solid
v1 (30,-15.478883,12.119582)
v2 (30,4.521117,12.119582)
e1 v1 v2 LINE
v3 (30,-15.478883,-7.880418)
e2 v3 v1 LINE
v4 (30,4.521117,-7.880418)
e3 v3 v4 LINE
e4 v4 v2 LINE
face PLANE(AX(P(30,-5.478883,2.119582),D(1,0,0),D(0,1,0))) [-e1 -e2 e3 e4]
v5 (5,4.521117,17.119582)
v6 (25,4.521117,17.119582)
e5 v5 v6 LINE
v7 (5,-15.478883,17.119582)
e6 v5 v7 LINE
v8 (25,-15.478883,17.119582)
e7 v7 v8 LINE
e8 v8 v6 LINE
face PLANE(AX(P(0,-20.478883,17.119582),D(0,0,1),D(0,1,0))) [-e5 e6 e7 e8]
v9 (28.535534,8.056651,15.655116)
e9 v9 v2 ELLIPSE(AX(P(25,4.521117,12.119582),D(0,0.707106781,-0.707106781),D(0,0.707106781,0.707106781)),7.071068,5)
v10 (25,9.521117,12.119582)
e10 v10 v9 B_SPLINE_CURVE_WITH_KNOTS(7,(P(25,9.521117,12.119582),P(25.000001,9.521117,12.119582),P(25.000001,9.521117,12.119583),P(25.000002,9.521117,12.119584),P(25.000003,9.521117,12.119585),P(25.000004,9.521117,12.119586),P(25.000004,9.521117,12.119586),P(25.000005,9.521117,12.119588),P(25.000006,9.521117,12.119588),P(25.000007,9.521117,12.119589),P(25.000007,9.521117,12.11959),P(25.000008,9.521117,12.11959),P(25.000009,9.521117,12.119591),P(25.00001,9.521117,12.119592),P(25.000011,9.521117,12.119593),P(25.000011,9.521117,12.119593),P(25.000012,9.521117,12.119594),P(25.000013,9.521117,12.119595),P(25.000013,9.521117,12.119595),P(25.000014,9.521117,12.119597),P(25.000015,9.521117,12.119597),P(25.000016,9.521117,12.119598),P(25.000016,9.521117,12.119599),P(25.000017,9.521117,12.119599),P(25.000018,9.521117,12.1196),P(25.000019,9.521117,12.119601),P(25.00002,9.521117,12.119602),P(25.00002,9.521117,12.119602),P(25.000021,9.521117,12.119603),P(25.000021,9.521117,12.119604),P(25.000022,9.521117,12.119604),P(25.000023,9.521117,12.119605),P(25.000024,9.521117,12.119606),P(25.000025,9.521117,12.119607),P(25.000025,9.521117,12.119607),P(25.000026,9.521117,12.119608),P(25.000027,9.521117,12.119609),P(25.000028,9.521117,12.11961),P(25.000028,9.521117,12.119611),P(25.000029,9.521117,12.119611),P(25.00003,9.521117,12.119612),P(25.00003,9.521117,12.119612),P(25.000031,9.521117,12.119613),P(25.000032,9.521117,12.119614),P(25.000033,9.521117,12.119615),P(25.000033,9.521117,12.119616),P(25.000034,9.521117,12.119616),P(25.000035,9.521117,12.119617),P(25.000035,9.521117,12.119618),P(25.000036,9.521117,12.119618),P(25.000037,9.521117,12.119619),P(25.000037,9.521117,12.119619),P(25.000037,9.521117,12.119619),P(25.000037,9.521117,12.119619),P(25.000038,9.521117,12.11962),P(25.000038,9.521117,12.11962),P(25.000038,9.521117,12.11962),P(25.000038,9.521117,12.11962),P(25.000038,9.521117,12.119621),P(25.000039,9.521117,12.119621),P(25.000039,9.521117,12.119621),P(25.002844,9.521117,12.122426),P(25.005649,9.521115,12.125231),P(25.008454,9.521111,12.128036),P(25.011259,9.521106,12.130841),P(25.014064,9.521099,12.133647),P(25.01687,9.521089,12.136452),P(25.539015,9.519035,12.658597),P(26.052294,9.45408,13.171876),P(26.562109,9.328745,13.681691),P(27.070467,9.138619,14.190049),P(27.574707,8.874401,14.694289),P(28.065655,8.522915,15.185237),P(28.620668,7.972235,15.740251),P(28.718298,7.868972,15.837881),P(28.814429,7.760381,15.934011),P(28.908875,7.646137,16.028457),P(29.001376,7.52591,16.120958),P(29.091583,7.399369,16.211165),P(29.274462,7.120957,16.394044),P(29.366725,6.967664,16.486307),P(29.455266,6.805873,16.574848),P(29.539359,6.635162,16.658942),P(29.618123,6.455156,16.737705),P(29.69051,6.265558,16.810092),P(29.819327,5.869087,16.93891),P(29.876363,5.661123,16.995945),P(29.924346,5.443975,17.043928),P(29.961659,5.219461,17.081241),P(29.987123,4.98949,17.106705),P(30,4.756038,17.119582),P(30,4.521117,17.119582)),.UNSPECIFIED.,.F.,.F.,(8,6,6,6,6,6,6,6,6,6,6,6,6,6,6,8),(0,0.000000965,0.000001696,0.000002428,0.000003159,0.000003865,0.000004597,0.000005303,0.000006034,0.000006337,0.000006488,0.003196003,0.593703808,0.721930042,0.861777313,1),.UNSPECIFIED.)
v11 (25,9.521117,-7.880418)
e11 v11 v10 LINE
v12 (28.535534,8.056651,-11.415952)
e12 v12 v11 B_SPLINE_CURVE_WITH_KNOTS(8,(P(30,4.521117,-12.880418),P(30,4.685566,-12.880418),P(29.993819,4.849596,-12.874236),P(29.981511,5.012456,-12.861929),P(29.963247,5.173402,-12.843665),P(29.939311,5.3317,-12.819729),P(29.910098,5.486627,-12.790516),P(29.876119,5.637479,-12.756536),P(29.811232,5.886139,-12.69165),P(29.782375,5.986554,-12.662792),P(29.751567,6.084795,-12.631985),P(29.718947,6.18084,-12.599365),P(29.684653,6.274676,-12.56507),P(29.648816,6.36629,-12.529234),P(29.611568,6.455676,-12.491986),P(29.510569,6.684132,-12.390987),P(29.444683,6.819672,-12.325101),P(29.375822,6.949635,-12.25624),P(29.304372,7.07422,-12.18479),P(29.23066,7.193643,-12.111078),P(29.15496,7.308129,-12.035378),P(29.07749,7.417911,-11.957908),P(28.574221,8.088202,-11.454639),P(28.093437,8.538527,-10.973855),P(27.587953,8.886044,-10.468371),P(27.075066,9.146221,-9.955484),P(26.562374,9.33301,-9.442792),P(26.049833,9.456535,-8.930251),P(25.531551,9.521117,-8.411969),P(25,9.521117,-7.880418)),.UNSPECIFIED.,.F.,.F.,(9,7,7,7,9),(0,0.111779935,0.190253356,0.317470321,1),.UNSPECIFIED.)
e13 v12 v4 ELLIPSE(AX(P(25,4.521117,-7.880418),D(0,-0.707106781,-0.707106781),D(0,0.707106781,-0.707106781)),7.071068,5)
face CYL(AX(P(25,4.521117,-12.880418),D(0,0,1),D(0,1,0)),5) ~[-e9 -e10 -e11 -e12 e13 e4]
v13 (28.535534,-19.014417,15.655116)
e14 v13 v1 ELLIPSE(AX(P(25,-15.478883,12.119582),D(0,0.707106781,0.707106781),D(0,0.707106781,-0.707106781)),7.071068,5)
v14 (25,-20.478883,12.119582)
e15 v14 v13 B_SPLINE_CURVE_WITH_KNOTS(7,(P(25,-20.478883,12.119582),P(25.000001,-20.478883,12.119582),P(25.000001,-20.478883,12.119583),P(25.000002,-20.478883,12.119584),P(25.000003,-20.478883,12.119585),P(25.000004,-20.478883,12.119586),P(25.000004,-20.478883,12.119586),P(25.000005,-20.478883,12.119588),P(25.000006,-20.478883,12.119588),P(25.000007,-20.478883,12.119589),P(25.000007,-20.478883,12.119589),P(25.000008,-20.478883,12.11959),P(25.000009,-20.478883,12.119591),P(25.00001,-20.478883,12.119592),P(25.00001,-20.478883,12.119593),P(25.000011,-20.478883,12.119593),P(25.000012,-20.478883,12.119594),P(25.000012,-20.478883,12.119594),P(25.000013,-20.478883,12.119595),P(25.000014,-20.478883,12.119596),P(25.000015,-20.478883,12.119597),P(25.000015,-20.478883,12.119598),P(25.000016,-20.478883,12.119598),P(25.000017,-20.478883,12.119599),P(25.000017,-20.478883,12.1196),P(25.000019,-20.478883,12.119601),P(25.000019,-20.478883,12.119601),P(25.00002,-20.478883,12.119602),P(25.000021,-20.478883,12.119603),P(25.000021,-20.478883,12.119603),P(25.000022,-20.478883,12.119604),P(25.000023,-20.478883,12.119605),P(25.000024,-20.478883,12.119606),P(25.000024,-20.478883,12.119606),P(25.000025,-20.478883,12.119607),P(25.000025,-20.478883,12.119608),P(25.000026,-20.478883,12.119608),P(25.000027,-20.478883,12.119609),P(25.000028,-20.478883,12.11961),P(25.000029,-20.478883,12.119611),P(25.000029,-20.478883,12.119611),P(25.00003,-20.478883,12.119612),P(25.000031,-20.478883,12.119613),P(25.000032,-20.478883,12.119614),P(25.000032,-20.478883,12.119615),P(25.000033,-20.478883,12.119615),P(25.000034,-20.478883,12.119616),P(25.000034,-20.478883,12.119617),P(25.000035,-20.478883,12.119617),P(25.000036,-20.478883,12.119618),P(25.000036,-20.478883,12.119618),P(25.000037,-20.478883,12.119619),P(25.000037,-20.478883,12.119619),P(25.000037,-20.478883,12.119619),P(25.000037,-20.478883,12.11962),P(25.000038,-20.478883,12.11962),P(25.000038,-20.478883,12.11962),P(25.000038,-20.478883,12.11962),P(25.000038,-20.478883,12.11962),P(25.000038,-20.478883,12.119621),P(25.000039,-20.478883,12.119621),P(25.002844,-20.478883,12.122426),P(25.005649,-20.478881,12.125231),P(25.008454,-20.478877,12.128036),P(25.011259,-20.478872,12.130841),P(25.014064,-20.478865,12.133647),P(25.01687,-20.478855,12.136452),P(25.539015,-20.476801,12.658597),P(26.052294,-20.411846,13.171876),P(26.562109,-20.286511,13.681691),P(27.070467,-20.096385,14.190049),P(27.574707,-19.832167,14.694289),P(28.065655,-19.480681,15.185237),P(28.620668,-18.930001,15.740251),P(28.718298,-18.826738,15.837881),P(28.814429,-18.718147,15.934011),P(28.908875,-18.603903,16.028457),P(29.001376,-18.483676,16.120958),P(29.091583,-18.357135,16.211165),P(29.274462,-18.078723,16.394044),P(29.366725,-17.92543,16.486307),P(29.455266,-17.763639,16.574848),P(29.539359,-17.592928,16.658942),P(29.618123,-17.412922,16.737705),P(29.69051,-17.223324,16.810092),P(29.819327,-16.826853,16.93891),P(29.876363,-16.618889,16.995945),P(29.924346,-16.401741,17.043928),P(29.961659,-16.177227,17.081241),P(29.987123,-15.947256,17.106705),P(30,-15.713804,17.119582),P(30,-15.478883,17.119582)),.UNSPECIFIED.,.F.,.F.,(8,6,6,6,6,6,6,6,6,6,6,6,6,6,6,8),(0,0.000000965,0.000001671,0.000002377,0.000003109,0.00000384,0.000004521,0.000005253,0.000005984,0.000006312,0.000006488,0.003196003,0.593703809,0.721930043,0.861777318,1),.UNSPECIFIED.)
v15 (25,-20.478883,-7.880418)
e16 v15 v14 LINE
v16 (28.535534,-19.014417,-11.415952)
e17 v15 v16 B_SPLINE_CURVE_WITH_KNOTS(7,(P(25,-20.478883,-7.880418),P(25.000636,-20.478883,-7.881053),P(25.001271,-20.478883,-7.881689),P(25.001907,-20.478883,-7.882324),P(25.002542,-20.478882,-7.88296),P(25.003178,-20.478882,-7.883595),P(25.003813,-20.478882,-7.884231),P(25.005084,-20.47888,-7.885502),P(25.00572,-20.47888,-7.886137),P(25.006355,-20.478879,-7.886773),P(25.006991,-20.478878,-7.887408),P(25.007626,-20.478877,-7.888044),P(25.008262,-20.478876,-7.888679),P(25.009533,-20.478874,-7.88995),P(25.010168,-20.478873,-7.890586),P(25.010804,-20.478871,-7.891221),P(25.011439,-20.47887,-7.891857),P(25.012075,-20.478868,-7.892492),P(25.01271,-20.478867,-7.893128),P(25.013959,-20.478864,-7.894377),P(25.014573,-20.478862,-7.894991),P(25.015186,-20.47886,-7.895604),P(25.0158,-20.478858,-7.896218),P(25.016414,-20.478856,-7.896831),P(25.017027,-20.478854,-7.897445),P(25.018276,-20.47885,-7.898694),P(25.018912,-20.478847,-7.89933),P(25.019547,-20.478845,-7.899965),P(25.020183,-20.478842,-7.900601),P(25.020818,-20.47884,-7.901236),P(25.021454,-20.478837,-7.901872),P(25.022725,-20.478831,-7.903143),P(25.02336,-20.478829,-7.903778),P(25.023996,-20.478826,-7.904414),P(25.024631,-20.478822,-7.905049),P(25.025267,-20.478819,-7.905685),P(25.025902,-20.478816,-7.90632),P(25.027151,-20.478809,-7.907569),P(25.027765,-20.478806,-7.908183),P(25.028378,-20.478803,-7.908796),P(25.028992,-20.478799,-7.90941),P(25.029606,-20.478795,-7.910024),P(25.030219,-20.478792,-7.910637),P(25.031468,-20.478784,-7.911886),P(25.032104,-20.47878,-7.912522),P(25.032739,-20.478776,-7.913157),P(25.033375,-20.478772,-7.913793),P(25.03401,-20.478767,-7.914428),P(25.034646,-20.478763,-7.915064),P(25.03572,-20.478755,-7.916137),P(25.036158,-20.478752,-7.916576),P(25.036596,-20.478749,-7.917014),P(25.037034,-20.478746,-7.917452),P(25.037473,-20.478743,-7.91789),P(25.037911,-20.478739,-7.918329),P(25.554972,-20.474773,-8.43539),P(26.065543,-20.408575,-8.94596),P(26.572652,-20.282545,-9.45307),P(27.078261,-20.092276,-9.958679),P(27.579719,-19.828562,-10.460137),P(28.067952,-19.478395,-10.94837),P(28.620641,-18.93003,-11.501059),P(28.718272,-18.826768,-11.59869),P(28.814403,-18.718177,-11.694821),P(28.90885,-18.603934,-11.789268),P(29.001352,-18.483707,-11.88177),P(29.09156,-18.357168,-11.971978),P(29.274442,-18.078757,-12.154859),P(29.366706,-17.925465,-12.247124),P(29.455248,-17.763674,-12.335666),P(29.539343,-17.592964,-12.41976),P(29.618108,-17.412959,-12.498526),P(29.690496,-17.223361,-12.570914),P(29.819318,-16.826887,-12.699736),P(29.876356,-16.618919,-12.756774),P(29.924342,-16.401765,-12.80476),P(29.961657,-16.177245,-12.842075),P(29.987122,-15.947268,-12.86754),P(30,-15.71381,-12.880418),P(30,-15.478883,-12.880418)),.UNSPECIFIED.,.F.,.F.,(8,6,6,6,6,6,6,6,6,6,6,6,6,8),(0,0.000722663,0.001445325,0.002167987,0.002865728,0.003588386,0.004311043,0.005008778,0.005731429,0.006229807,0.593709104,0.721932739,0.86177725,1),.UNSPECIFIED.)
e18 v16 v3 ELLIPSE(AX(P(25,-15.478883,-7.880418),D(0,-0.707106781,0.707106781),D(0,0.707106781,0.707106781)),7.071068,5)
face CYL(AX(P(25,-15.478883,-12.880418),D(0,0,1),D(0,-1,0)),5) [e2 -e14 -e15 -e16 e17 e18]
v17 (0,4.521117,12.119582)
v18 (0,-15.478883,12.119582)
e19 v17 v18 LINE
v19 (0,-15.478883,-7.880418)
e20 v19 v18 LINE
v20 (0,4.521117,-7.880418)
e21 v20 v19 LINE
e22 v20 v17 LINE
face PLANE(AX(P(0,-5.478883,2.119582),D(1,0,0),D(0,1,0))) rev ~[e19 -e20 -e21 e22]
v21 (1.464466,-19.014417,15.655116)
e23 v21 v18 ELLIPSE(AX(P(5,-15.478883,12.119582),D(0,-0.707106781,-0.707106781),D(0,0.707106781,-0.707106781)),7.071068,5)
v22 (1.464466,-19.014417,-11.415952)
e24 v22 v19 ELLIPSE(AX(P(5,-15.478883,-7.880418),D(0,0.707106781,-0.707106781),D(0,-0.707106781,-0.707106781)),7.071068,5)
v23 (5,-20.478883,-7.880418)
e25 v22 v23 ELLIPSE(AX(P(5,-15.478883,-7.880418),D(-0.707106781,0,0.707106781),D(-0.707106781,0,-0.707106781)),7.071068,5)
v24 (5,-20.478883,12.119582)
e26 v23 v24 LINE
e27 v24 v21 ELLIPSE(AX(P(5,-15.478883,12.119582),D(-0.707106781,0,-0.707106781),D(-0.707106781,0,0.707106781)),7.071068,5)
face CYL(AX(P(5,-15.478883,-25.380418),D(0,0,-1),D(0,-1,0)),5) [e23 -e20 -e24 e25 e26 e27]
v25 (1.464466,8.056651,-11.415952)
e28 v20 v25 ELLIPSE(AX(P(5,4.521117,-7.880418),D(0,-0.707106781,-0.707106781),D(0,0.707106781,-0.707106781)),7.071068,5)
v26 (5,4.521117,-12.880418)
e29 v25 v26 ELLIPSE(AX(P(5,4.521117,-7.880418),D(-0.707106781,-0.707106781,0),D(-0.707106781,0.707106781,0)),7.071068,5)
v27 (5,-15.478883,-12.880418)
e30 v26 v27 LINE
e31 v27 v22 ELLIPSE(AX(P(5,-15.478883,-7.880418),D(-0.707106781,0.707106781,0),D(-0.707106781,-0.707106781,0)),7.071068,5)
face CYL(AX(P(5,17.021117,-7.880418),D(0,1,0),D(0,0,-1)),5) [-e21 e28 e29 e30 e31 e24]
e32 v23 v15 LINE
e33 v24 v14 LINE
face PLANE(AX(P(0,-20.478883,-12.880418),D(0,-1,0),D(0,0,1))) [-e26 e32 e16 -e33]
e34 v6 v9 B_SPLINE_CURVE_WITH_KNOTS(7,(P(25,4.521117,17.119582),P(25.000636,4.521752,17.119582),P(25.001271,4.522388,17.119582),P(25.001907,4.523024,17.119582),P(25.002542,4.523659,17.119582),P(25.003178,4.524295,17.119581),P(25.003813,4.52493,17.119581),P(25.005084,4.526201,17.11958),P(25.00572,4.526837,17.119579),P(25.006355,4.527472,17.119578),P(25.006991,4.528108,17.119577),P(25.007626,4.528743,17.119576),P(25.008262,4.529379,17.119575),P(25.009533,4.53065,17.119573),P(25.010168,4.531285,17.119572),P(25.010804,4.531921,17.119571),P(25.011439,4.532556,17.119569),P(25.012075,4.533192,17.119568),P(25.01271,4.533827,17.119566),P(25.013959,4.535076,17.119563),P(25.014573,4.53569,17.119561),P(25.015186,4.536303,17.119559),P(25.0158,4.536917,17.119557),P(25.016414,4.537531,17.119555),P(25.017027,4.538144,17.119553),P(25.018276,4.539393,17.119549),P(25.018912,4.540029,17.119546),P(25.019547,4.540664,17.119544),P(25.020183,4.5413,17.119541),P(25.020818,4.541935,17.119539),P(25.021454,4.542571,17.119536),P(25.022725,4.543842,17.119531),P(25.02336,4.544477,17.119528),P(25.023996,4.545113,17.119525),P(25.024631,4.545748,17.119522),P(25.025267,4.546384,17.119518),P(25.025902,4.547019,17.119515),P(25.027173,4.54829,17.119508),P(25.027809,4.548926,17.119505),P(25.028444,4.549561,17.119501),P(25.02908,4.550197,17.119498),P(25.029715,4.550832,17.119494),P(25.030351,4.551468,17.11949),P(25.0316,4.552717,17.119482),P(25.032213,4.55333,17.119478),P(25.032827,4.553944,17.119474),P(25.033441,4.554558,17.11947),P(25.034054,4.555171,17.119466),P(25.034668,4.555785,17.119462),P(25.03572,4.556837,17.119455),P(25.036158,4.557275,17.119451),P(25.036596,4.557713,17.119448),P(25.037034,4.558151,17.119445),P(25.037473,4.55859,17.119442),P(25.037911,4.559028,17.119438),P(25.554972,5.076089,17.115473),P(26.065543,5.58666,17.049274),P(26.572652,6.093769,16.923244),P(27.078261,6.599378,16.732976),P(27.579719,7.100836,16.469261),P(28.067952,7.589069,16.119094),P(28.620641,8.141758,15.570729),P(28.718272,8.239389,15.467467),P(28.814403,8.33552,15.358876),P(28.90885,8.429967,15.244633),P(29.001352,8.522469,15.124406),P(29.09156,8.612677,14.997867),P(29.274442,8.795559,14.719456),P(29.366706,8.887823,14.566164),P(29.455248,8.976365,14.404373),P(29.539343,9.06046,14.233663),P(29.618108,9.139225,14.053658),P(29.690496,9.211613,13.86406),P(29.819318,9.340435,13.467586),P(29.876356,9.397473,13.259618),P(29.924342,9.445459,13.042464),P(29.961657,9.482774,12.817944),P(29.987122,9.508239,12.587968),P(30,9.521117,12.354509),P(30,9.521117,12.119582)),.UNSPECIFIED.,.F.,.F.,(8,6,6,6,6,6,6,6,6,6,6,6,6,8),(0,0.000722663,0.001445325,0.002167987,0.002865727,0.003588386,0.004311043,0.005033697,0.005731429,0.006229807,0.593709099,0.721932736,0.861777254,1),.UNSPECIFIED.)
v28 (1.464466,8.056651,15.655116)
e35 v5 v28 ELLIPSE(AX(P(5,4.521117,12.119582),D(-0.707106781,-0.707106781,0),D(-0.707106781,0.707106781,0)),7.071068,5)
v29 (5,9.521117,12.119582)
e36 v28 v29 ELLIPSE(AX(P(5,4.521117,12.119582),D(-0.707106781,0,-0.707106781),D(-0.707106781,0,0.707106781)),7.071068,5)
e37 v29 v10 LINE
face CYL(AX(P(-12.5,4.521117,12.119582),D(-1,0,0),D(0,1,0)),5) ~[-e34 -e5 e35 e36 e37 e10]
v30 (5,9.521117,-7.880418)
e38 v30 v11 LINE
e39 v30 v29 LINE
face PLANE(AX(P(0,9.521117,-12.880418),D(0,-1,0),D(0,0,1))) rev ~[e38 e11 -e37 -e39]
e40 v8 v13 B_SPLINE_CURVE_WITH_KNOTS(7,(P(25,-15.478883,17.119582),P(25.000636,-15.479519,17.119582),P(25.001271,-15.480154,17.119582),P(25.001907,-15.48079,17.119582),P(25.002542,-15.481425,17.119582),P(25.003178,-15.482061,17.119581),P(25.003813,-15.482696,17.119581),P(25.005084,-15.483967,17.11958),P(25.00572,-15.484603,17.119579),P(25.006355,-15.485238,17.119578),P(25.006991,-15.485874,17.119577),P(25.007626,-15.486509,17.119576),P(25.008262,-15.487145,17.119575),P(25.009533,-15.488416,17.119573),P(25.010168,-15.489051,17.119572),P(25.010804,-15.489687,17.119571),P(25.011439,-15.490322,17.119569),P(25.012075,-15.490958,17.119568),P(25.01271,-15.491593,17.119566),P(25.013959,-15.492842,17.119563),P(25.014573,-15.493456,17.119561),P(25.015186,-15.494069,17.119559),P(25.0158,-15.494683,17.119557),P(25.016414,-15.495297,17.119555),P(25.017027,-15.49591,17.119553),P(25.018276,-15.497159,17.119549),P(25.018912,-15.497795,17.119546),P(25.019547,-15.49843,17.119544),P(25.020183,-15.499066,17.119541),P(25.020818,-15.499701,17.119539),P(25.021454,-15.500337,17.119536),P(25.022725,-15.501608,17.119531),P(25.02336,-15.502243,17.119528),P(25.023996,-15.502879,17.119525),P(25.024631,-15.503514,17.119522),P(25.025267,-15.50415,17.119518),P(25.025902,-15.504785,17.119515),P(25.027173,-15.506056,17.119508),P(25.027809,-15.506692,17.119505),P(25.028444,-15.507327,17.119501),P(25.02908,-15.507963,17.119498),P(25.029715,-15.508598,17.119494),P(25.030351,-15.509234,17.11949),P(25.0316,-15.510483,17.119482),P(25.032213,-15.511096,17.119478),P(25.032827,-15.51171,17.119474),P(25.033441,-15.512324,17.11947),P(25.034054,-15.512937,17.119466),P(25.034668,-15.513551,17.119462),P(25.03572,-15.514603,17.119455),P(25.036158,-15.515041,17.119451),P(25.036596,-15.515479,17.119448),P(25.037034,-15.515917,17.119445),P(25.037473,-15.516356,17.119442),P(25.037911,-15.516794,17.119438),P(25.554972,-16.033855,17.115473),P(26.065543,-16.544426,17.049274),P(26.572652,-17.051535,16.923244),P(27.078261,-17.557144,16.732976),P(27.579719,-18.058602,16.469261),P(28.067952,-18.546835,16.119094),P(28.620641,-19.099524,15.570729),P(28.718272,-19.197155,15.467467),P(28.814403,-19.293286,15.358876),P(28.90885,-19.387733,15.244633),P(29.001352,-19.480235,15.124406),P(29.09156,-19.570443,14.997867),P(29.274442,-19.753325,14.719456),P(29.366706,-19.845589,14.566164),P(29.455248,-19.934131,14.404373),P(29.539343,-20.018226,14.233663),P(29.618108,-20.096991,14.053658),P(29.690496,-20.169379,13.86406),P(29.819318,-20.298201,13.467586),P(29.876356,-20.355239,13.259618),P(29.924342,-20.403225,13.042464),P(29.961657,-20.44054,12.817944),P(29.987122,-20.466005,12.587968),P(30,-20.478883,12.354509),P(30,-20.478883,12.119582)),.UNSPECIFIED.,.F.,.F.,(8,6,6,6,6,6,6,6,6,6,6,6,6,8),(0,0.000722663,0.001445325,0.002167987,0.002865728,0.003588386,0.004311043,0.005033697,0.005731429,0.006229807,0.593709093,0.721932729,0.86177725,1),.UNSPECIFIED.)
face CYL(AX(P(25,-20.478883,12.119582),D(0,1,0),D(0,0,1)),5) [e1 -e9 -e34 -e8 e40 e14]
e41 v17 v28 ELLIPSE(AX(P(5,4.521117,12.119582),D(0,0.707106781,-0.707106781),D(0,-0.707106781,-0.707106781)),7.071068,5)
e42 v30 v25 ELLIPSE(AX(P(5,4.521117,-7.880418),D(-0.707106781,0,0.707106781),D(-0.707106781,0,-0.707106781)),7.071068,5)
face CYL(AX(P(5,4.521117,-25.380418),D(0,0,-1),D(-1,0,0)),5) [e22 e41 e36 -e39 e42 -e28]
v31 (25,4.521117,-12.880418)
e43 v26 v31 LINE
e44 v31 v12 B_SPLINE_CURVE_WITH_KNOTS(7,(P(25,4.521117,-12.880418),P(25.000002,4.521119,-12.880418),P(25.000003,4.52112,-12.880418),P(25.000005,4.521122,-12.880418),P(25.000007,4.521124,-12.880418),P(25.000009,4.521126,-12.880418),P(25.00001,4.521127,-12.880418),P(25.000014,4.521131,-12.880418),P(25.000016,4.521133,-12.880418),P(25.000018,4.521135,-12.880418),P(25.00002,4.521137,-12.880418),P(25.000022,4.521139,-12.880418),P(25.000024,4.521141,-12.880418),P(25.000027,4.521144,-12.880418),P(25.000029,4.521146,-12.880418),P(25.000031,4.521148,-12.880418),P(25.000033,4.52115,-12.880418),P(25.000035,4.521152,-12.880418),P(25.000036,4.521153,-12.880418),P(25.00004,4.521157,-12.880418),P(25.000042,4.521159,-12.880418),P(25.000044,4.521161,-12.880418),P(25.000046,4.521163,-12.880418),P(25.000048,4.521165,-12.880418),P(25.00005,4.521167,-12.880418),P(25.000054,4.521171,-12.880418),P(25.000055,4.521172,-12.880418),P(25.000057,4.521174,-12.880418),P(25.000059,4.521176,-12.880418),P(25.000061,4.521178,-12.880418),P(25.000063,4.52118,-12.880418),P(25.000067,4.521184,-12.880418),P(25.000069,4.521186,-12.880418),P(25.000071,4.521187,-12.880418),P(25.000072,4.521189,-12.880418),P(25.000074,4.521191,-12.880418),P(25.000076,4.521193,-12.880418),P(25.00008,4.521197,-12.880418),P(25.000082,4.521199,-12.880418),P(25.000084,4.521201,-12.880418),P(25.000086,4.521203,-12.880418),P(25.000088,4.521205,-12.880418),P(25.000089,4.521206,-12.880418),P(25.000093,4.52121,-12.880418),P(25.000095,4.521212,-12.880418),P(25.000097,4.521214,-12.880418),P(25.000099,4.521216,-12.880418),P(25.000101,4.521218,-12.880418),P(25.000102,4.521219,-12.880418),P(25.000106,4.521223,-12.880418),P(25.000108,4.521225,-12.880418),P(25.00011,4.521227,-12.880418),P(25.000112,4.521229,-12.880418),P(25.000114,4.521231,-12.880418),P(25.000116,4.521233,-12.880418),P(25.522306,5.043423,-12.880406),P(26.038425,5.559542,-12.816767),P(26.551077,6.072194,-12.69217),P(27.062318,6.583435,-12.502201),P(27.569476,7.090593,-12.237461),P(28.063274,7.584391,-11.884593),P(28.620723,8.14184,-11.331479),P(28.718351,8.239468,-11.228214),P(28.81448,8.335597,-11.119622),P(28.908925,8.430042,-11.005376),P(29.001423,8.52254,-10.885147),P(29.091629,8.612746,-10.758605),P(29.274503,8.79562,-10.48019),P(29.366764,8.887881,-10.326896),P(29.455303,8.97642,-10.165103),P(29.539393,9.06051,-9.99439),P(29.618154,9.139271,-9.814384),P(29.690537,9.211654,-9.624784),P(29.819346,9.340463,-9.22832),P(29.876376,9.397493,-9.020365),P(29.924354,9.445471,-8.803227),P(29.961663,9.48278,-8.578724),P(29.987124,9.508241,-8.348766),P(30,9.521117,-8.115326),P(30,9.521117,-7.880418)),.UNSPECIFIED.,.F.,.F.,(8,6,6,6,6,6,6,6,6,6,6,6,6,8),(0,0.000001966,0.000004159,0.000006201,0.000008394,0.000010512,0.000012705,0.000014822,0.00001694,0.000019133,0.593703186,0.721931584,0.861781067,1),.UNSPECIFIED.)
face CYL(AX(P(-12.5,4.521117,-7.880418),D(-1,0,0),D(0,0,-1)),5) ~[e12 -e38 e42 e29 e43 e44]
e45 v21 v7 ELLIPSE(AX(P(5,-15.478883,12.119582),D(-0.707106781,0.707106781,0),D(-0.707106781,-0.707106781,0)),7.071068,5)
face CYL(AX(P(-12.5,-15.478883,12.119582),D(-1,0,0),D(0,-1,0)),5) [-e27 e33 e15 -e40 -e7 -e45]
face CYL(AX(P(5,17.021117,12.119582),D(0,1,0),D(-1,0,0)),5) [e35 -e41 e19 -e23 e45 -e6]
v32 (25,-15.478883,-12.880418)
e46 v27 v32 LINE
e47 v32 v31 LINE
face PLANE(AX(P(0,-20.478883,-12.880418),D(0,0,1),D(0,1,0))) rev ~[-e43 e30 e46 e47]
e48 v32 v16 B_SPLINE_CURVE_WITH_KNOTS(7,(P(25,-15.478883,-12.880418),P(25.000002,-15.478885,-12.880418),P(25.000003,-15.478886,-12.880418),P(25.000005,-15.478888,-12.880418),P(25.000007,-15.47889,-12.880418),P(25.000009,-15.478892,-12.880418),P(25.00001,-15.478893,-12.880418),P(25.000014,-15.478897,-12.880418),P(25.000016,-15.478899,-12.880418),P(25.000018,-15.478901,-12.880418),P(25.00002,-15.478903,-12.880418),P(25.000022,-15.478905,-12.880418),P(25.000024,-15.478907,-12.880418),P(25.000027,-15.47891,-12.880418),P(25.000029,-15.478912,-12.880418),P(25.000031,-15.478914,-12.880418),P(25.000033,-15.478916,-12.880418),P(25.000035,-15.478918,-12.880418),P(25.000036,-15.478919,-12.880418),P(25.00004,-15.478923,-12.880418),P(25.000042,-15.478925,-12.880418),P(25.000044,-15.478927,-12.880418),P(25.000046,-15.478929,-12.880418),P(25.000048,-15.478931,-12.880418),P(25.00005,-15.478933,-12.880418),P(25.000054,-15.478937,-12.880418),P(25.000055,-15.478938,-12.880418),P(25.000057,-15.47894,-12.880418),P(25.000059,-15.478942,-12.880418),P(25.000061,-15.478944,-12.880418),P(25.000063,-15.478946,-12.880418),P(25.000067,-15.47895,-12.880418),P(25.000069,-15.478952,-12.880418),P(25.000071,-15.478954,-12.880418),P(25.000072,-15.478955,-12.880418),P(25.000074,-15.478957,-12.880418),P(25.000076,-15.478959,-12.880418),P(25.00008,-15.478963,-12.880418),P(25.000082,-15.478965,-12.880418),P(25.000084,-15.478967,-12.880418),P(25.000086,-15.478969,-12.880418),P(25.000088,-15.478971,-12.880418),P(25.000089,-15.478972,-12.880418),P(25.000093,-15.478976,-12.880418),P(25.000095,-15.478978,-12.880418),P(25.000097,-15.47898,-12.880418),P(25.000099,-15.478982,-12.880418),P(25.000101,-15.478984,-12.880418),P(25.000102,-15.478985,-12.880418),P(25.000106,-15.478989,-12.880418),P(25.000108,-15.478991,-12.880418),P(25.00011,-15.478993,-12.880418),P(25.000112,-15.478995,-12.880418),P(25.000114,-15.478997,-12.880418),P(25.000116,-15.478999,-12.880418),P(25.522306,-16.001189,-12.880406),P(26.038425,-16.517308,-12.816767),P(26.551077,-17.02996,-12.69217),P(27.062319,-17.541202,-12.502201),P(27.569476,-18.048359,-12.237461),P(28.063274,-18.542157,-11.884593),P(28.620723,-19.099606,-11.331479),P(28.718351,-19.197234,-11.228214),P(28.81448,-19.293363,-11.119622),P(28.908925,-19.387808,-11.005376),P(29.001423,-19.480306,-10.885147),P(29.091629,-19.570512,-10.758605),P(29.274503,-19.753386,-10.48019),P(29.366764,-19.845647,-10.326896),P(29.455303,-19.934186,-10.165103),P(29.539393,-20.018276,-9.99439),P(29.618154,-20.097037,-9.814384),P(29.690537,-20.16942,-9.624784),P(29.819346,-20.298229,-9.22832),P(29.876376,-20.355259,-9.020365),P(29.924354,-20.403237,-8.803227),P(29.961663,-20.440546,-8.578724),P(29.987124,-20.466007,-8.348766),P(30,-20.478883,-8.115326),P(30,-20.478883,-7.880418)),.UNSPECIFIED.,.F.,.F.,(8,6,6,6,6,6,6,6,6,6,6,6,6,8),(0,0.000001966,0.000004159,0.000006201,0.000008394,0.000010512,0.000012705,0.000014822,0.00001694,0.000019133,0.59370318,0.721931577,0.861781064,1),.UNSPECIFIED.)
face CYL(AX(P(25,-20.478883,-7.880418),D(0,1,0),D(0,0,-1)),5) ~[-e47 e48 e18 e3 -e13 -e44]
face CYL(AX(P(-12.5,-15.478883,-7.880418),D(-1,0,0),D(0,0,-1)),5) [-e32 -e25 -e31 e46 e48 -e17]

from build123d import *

# Parameters (mm, degrees)
F0_W        = 30
F0_H        = 30
F1_DEPTH    = 30
F2_R        = 5
F3_T1_DEPTH = 50
F3_T3_DEPTH = 55
F4_T1_DEPTH = 50
F4_T3_DEPTH = 55
F6_T1_DEPTH = 45


# Not quite as in the source:
# - a fillet or chamfer that OpenCascade refuses, or shapes differently, is made with other operations: its cross-section is extruded or revolved along the edge and cut away or added
# - a feature of the source that left no trace in its solid (it failed there, or was rolled back) is left out


with BuildPart() as f1:
    # F0 (on Right) → F1 (new body)
    with BuildSketch(Plane.YZ):
        with Locations((-5.478883007, 2.1195821464)):
            Rectangle(F0_W, F0_H)
    extrude(amount=F1_DEPTH)

    # F2
    f2_edges = [f1.edges().sort_by_distance(p)[0] for p in [
        (30, -5.478883, -12.880418),
        (30, 9.521117, 2.119582),
        (30, -5.478883, 17.119582),
        (30, -20.478883, 2.119582),
    ]]
    fillet(f2_edges, radius=F2_R)

    # F3: fillet of radius 5 on 4 edges, made by hand

    # F3_s2 → F3_t1 (cut)
    with BuildSketch(Plane.YZ.offset(-12.5)):
        with BuildLine():
            ThreePointArc((4.521116993, -12.8804178536), (8.0566508989, -11.4159517595), (9.521116993, -7.8804178536))
            Line((9.521116993, -7.8804178536), (9.521116993, -12.8804178536))
            Line((9.521116993, -12.8804178536), (4.521116993, -12.8804178536))
        make_face()
        with BuildLine():
            ThreePointArc((9.521116993, 12.1195821464), (8.0566508989, 15.6551160523), (4.521116993, 17.1195821464))
            Line((4.521116993, 17.1195821464), (9.521116993, 17.1195821464))
            Line((9.521116993, 17.1195821464), (9.521116993, 12.1195821464))
        make_face()
    extrude(amount=F3_T1_DEPTH, mode=Mode.SUBTRACT)

    # F3_s4 → F3_t3 (cut)
    with BuildSketch(Plane.XY.offset(-25.3804178536)):
        with BuildLine():
            ThreePointArc((0, 4.521116993), (1.4644660941, 8.0566508989), (5, 9.521116993))
            Line((5, 9.521116993), (0, 9.521116993))
            Line((0, 9.521116993), (0, 4.521116993))
        make_face()
    extrude(amount=F3_T3_DEPTH, mode=Mode.SUBTRACT)

    # F4: fillet of radius 5 on 4 edges, made by hand

    # F4_s2 → F4_t1 (cut)
    with BuildSketch(Plane.YZ.offset(-12.5)):
        with BuildLine():
            ThreePointArc((-20.478883007, 12.1195821464), (-19.0144169129, 15.6551160523), (-15.478883007, 17.1195821464))
            Line((-15.478883007, 17.1195821464), (-20.478883007, 17.1195821464))
            Line((-20.478883007, 17.1195821464), (-20.478883007, 12.1195821464))
        make_face()
        with BuildLine():
            ThreePointArc((-15.478883007, -12.8804178536), (-19.0144169129, -11.4159517595), (-20.478883007, -7.8804178536))
            Line((-20.478883007, -7.8804178536), (-20.478883007, -12.8804178536))
            Line((-20.478883007, -12.8804178536), (-15.478883007, -12.8804178536))
        make_face()
    extrude(amount=F4_T1_DEPTH, mode=Mode.SUBTRACT)

    # F4_s4 → F4_t3 (cut)
    with BuildSketch(Plane.XY.offset(-25.3804178536)):
        with BuildLine():
            ThreePointArc((5, -20.478883007), (1.4644660941, -19.0144169129), (0, -15.478883007))
            Line((0, -15.478883007), (0, -20.478883007))
            Line((0, -20.478883007), (5, -20.478883007))
        make_face()
    extrude(amount=F4_T3_DEPTH, mode=Mode.SUBTRACT)

    # F6: fillet of radius 5 on 4 edges, made by hand

    # F6_s2 → F6_t1 (cut)
    with BuildSketch(Plane.XZ.offset(-17.021116993)):
        with BuildLine():
            ThreePointArc((5, -12.8804178536), (1.4644660941, -11.4159517595), (0, -7.8804178536))
            Line((0, -7.8804178536), (0, -12.8804178536))
            Line((0, -12.8804178536), (5, -12.8804178536))
        make_face()
        with BuildLine():
            ThreePointArc((0, 12.1195821464), (1.4644660941, 15.6551160523), (5, 17.1195821464))
            Line((5, 17.1195821464), (0, 17.1195821464))
            Line((0, 17.1195821464), (0, 12.1195821464))
        make_face()
    extrude(amount=F6_T1_DEPTH, mode=Mode.SUBTRACT)


solid = f1.part
